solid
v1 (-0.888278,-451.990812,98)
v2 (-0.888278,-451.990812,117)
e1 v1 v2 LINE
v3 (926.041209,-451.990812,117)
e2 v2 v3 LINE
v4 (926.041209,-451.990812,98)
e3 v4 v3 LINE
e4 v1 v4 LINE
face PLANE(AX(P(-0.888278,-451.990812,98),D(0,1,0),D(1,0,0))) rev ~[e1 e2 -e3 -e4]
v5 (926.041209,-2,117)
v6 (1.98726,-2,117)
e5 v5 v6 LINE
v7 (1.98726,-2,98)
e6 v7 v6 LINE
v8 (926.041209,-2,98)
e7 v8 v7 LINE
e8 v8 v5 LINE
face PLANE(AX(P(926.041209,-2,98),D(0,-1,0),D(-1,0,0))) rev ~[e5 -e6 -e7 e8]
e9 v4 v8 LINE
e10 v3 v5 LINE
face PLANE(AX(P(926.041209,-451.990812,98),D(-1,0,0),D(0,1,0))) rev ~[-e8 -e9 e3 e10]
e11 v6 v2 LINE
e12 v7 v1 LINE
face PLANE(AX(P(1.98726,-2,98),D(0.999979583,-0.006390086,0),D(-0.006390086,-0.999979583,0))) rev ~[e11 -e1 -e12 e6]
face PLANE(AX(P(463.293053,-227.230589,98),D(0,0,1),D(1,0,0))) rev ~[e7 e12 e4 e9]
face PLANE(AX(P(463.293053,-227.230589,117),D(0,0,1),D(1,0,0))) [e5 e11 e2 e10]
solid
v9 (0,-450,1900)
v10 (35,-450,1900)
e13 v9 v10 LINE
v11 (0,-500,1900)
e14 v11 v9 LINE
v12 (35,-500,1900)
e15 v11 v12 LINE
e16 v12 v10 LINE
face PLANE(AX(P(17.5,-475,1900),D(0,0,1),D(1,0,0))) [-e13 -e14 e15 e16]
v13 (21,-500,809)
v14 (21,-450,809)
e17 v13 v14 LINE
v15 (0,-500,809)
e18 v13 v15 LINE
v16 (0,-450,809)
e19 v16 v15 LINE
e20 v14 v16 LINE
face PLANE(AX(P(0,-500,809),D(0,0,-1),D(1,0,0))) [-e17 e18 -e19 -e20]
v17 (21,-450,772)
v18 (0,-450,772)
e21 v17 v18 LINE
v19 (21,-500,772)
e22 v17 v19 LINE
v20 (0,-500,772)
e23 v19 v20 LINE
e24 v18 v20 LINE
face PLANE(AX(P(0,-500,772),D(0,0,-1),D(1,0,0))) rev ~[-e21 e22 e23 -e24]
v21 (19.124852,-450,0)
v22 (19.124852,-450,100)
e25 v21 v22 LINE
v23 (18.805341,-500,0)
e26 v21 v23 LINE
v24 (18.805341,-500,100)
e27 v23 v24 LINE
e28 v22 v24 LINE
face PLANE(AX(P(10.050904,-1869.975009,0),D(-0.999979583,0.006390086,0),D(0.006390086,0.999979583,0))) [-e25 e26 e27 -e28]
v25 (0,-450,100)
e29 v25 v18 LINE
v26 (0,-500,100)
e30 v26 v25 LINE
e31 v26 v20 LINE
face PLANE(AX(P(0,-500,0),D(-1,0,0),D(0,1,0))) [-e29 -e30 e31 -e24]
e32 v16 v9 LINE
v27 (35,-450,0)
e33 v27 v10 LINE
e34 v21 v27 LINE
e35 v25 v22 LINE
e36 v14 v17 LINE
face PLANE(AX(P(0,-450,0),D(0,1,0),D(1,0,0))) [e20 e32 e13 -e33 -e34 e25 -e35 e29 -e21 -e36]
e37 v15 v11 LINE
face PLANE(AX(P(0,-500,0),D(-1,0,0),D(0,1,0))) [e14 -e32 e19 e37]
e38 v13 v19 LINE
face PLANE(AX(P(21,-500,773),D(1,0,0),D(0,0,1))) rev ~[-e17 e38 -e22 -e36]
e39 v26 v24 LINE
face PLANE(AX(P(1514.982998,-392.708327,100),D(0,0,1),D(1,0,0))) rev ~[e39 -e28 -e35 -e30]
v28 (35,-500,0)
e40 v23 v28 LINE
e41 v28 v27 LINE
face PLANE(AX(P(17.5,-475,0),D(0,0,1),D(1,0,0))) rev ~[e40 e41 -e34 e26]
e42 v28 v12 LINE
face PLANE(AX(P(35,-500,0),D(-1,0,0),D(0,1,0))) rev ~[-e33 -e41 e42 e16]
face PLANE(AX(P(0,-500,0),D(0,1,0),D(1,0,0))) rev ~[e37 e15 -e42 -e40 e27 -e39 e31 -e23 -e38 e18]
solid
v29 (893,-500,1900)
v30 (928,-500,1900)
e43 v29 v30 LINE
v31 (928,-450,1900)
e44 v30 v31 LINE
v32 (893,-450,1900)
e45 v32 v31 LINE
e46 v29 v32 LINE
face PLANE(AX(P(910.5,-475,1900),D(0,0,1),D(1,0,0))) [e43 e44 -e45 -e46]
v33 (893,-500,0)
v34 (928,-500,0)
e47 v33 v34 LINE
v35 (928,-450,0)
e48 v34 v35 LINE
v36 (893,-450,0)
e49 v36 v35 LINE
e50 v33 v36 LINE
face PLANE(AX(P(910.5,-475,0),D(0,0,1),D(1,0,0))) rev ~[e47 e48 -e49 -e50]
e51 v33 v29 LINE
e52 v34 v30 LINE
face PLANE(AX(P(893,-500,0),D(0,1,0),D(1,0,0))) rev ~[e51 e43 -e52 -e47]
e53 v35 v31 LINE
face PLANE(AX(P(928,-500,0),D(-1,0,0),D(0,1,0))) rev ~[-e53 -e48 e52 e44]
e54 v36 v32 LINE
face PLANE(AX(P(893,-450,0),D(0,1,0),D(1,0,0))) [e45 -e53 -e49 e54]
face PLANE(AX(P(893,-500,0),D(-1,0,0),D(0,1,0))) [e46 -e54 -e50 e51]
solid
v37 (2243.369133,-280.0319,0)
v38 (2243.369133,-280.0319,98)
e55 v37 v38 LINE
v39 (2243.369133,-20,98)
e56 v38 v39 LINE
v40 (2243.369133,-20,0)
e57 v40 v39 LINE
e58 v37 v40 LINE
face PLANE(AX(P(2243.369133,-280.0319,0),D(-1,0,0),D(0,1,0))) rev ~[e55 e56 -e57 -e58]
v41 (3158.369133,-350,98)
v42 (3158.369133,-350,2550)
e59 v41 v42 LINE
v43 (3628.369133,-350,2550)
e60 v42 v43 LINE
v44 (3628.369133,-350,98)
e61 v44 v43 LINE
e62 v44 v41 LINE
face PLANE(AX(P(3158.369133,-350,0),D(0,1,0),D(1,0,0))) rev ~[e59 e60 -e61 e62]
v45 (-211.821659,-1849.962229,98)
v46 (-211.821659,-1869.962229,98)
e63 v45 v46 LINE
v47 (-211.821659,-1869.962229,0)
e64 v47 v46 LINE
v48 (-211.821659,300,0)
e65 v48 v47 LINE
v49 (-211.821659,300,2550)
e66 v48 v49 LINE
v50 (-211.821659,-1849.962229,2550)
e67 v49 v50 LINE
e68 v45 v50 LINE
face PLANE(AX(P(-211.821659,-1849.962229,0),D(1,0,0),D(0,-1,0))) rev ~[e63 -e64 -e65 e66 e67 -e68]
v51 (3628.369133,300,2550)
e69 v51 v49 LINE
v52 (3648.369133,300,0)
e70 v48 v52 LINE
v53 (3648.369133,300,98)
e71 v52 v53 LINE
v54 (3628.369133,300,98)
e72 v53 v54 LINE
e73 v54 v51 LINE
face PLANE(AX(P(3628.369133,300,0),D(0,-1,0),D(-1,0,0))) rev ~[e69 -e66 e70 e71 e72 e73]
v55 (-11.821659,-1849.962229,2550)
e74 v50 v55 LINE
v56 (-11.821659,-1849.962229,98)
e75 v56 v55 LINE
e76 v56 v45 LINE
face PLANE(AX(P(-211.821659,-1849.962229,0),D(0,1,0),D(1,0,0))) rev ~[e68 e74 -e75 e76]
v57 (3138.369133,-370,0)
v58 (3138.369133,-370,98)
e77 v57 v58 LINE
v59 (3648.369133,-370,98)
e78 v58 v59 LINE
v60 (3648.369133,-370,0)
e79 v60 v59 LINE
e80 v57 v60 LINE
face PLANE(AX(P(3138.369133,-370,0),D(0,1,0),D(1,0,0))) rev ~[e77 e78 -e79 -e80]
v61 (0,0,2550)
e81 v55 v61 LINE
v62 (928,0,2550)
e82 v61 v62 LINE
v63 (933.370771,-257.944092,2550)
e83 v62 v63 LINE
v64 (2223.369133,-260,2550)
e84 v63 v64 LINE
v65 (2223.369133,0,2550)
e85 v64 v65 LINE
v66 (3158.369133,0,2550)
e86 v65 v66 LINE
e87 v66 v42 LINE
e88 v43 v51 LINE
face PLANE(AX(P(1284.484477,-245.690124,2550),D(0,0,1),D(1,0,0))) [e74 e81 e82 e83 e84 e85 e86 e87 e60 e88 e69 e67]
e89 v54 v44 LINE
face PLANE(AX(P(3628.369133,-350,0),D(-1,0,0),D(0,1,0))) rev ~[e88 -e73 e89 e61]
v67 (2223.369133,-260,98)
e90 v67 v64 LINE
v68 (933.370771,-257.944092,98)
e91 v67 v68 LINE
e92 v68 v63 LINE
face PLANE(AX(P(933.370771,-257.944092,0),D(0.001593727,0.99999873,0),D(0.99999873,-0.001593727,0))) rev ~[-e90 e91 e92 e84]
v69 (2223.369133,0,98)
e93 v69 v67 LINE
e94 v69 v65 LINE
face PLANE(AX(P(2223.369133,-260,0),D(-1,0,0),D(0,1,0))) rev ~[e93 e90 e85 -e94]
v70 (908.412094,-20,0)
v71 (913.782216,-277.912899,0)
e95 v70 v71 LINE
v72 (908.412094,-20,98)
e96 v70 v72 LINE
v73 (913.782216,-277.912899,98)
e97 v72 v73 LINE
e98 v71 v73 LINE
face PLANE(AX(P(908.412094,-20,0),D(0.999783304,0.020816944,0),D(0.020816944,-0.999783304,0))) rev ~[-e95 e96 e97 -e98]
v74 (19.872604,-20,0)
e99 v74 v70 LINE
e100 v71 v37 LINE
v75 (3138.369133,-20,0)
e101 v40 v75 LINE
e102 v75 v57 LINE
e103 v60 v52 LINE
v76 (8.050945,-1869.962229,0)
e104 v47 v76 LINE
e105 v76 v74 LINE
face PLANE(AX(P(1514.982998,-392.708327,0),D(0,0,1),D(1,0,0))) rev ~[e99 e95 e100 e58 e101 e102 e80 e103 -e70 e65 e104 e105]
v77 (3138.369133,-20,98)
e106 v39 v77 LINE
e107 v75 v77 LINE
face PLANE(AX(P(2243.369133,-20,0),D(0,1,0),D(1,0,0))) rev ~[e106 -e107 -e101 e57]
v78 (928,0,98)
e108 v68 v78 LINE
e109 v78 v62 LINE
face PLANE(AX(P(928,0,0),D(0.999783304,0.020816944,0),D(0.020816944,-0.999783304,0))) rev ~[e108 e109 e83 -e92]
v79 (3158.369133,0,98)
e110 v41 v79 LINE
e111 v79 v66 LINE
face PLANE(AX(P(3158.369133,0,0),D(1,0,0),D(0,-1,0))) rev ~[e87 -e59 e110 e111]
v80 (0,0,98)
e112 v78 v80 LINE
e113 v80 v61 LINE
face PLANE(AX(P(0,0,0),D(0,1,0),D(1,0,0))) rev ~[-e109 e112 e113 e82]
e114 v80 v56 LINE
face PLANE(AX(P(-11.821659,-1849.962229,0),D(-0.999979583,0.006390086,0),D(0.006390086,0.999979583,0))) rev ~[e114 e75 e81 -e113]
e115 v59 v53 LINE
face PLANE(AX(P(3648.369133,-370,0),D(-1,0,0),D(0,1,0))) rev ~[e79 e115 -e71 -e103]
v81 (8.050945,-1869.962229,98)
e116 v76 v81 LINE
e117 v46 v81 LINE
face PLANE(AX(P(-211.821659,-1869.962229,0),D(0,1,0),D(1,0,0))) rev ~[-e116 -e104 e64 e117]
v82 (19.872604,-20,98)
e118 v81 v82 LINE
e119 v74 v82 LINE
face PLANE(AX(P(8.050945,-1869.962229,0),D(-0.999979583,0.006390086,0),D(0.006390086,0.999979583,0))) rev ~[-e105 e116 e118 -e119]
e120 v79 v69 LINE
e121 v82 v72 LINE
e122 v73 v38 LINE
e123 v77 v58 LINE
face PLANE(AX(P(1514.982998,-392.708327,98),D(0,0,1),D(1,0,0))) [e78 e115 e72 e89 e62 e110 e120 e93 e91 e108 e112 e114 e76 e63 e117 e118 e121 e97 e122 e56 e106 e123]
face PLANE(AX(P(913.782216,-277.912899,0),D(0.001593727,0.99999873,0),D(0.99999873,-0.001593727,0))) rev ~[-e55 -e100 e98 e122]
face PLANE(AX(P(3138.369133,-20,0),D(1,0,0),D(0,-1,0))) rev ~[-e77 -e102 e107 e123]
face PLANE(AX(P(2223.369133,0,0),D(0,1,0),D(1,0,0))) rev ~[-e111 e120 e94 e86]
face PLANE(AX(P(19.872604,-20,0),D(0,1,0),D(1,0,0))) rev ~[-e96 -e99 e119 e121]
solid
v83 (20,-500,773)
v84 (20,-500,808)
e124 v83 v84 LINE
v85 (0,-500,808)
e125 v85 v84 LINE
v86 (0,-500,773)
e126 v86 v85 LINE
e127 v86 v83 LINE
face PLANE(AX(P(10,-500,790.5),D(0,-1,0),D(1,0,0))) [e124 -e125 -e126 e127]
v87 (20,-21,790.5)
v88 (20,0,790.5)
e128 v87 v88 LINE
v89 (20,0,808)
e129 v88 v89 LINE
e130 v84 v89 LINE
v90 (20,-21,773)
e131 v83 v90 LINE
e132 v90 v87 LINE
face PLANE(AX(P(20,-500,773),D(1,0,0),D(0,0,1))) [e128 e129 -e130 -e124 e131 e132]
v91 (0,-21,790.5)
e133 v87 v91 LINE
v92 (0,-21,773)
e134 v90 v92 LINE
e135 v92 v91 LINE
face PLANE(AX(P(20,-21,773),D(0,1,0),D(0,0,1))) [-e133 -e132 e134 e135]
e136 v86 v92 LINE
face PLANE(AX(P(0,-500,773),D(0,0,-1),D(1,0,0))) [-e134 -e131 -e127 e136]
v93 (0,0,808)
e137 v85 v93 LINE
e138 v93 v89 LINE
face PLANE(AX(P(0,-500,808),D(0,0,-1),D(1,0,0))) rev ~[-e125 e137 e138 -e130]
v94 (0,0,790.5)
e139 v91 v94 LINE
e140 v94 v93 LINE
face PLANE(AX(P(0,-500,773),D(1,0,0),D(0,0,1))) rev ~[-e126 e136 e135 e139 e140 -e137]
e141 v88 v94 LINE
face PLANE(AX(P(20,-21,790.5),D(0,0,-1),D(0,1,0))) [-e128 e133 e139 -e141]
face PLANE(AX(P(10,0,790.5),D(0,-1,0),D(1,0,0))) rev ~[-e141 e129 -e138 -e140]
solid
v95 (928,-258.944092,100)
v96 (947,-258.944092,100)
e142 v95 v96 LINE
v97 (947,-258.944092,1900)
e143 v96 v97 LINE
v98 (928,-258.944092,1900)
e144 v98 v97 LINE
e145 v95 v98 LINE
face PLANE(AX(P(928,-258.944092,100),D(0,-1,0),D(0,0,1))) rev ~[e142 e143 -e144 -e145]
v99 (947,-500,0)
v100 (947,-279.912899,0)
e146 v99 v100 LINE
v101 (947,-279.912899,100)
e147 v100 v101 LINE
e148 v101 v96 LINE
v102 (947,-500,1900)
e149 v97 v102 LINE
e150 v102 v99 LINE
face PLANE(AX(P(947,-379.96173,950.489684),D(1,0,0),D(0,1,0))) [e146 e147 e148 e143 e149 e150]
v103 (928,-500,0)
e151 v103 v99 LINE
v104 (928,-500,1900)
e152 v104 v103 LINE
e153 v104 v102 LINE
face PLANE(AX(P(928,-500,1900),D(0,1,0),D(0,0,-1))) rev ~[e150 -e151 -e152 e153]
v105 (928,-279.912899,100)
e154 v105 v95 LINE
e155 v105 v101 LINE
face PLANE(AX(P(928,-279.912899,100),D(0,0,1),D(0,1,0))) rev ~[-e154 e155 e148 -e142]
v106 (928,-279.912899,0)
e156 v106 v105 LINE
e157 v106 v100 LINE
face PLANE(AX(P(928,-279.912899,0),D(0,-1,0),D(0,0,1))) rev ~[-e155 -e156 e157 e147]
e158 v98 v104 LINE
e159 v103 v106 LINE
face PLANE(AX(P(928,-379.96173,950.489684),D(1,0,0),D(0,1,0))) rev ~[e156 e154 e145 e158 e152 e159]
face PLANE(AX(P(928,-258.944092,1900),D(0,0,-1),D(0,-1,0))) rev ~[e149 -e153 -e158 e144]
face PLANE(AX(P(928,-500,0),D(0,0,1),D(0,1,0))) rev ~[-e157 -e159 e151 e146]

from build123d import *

# Parameters (mm, degrees)
F1_DEPTH   = 2550
F2_DEPTH   = 98
F3_W       = 35
F3_H       = 50
F4_DEPTH   = 1900
F5_OFFSET  = 2
F6_W       = 35
F6_H       = 50
F7_DEPTH   = 1900
F10_DEPTH  = 19
F11_W      = 20
F11_H      = 35
F12_DEPTH  = 500
F13_OFFSET = 1
F14_W      = 21
F14_H      = 17.5
F15_DEPTH  = 20
F17_DEPTH  = 19


# Not quite as in the source:
# - a feature names something its author has since deleted; it is built from what else it names


with BuildPart() as f1:
    # F0 (on Top) → F1 (new body)
    with BuildSketch(Plane.XY):
        Polygon((-211.8216594828, -1849.9622289028), (-11.8216594828, -1849.9622289028), (0, 0), (928, 0), (933.3707714659, -257.944092419), (2223.3691331874, -260), (2223.3691331874, 0), (3158.3691331874, 0), (3158.3691331874, -350), (3628.3691331874, -350), (3628.3691331874, 300), (-211.8216594828, 300), align=None)
    extrude(amount=F1_DEPTH)

    # F0 (on Top) → F2 (join)
    with BuildSketch(Plane.XY):
        Polygon((0, 0), (-11.8216594828, -1849.9622289028), (-211.8216594828, -1849.9622289028), (-211.8216594828, -1869.9622289028), (8.0509445283, -1869.9622289028), (19.872604011, -20), (908.4120942515, -20), (913.7822162245, -277.9128989735), (2243.3691331874, -280.0318999763), (2243.3691331874, -20), (3138.3691331874, -20), (3138.3691331874, -370), (3648.3691331874, -370), (3648.3691331874, 300), (3628.3691331874, 300), (3628.3691331874, -350), (3158.3691331874, -350), (3158.3691331874, 0), (2223.3691331874, 0), (2223.3691331874, -260), (933.3707714659, -257.944092419), (928, 0), align=None)
    extrude(amount=F2_DEPTH)


with BuildPart() as f4:
    # F3 (on Top) → F4 (new body)
    with BuildSketch(Plane.XY):
        with Locations((17.5, -475)):
            Rectangle(F3_W, F3_H)
    extrude(amount=F4_DEPTH)

    # F5: cut F1, made larger all round first
    f5_tool = offset(f1.part, amount=F5_OFFSET, kind=Kind.INTERSECTION, mode=Mode.PRIVATE)
    add(f5_tool, mode=Mode.SUBTRACT)


with BuildPart() as f7:
    # F6 (on Top) → F7 (new body, through all)
    with BuildSketch(Plane.XY):
        with Locations((910.5, -475)):
            Rectangle(F6_W, F6_H)
    extrude(amount=F7_DEPTH)


with BuildPart() as f10:
    # F9 (on face) → F10 (new body)
    with BuildSketch(Plane.XY.offset(98)):
        Polygon((1.9872604011, -2), (-0.888278392, -451.9908124358), (926.0412094252, -451.9908124358), (926.0412094252, -2), align=None)
    extrude(amount=F10_DEPTH)


with BuildPart() as f12:
    # F11 (on face) → F12 (new body, through all)
    with BuildSketch(Plane.XZ.offset(500)):
        with Locations((10, 790.5)):
            Rectangle(F11_W, F11_H)
    extrude(amount=-F12_DEPTH)


with BuildPart() as f4_1:
    add(f4.part)

    # F13: cut F12, made larger all round first
    f13_tool = offset(f12.part, amount=F13_OFFSET, kind=Kind.INTERSECTION, mode=Mode.PRIVATE)
    add(f13_tool, mode=Mode.SUBTRACT)


with BuildPart() as f12_1:
    add(f12.part)

    # F14 (on face) → F15 (cut, through all)
    with BuildSketch(Plane.YZ.offset(20)):
        with Locations((-10.5, 781.75)):
            Rectangle(F14_W, F14_H)
    extrude(amount=-F15_DEPTH, mode=Mode.SUBTRACT)


with BuildPart() as f17:
    # F16 (on face) → F17 (new body)
    with BuildSketch(Plane.YZ.offset(928)):
        Polygon((-500, 1900), (-500, 0), (-279.9128989735, 0), (-279.9128989735, 100), (-258.944092419, 100), (-258.944092419, 1900), align=None)
    extrude(amount=F17_DEPTH)


solid = Compound([f1.part, f7.part, f10.part, f4_1.part, f12_1.part, f17.part])
